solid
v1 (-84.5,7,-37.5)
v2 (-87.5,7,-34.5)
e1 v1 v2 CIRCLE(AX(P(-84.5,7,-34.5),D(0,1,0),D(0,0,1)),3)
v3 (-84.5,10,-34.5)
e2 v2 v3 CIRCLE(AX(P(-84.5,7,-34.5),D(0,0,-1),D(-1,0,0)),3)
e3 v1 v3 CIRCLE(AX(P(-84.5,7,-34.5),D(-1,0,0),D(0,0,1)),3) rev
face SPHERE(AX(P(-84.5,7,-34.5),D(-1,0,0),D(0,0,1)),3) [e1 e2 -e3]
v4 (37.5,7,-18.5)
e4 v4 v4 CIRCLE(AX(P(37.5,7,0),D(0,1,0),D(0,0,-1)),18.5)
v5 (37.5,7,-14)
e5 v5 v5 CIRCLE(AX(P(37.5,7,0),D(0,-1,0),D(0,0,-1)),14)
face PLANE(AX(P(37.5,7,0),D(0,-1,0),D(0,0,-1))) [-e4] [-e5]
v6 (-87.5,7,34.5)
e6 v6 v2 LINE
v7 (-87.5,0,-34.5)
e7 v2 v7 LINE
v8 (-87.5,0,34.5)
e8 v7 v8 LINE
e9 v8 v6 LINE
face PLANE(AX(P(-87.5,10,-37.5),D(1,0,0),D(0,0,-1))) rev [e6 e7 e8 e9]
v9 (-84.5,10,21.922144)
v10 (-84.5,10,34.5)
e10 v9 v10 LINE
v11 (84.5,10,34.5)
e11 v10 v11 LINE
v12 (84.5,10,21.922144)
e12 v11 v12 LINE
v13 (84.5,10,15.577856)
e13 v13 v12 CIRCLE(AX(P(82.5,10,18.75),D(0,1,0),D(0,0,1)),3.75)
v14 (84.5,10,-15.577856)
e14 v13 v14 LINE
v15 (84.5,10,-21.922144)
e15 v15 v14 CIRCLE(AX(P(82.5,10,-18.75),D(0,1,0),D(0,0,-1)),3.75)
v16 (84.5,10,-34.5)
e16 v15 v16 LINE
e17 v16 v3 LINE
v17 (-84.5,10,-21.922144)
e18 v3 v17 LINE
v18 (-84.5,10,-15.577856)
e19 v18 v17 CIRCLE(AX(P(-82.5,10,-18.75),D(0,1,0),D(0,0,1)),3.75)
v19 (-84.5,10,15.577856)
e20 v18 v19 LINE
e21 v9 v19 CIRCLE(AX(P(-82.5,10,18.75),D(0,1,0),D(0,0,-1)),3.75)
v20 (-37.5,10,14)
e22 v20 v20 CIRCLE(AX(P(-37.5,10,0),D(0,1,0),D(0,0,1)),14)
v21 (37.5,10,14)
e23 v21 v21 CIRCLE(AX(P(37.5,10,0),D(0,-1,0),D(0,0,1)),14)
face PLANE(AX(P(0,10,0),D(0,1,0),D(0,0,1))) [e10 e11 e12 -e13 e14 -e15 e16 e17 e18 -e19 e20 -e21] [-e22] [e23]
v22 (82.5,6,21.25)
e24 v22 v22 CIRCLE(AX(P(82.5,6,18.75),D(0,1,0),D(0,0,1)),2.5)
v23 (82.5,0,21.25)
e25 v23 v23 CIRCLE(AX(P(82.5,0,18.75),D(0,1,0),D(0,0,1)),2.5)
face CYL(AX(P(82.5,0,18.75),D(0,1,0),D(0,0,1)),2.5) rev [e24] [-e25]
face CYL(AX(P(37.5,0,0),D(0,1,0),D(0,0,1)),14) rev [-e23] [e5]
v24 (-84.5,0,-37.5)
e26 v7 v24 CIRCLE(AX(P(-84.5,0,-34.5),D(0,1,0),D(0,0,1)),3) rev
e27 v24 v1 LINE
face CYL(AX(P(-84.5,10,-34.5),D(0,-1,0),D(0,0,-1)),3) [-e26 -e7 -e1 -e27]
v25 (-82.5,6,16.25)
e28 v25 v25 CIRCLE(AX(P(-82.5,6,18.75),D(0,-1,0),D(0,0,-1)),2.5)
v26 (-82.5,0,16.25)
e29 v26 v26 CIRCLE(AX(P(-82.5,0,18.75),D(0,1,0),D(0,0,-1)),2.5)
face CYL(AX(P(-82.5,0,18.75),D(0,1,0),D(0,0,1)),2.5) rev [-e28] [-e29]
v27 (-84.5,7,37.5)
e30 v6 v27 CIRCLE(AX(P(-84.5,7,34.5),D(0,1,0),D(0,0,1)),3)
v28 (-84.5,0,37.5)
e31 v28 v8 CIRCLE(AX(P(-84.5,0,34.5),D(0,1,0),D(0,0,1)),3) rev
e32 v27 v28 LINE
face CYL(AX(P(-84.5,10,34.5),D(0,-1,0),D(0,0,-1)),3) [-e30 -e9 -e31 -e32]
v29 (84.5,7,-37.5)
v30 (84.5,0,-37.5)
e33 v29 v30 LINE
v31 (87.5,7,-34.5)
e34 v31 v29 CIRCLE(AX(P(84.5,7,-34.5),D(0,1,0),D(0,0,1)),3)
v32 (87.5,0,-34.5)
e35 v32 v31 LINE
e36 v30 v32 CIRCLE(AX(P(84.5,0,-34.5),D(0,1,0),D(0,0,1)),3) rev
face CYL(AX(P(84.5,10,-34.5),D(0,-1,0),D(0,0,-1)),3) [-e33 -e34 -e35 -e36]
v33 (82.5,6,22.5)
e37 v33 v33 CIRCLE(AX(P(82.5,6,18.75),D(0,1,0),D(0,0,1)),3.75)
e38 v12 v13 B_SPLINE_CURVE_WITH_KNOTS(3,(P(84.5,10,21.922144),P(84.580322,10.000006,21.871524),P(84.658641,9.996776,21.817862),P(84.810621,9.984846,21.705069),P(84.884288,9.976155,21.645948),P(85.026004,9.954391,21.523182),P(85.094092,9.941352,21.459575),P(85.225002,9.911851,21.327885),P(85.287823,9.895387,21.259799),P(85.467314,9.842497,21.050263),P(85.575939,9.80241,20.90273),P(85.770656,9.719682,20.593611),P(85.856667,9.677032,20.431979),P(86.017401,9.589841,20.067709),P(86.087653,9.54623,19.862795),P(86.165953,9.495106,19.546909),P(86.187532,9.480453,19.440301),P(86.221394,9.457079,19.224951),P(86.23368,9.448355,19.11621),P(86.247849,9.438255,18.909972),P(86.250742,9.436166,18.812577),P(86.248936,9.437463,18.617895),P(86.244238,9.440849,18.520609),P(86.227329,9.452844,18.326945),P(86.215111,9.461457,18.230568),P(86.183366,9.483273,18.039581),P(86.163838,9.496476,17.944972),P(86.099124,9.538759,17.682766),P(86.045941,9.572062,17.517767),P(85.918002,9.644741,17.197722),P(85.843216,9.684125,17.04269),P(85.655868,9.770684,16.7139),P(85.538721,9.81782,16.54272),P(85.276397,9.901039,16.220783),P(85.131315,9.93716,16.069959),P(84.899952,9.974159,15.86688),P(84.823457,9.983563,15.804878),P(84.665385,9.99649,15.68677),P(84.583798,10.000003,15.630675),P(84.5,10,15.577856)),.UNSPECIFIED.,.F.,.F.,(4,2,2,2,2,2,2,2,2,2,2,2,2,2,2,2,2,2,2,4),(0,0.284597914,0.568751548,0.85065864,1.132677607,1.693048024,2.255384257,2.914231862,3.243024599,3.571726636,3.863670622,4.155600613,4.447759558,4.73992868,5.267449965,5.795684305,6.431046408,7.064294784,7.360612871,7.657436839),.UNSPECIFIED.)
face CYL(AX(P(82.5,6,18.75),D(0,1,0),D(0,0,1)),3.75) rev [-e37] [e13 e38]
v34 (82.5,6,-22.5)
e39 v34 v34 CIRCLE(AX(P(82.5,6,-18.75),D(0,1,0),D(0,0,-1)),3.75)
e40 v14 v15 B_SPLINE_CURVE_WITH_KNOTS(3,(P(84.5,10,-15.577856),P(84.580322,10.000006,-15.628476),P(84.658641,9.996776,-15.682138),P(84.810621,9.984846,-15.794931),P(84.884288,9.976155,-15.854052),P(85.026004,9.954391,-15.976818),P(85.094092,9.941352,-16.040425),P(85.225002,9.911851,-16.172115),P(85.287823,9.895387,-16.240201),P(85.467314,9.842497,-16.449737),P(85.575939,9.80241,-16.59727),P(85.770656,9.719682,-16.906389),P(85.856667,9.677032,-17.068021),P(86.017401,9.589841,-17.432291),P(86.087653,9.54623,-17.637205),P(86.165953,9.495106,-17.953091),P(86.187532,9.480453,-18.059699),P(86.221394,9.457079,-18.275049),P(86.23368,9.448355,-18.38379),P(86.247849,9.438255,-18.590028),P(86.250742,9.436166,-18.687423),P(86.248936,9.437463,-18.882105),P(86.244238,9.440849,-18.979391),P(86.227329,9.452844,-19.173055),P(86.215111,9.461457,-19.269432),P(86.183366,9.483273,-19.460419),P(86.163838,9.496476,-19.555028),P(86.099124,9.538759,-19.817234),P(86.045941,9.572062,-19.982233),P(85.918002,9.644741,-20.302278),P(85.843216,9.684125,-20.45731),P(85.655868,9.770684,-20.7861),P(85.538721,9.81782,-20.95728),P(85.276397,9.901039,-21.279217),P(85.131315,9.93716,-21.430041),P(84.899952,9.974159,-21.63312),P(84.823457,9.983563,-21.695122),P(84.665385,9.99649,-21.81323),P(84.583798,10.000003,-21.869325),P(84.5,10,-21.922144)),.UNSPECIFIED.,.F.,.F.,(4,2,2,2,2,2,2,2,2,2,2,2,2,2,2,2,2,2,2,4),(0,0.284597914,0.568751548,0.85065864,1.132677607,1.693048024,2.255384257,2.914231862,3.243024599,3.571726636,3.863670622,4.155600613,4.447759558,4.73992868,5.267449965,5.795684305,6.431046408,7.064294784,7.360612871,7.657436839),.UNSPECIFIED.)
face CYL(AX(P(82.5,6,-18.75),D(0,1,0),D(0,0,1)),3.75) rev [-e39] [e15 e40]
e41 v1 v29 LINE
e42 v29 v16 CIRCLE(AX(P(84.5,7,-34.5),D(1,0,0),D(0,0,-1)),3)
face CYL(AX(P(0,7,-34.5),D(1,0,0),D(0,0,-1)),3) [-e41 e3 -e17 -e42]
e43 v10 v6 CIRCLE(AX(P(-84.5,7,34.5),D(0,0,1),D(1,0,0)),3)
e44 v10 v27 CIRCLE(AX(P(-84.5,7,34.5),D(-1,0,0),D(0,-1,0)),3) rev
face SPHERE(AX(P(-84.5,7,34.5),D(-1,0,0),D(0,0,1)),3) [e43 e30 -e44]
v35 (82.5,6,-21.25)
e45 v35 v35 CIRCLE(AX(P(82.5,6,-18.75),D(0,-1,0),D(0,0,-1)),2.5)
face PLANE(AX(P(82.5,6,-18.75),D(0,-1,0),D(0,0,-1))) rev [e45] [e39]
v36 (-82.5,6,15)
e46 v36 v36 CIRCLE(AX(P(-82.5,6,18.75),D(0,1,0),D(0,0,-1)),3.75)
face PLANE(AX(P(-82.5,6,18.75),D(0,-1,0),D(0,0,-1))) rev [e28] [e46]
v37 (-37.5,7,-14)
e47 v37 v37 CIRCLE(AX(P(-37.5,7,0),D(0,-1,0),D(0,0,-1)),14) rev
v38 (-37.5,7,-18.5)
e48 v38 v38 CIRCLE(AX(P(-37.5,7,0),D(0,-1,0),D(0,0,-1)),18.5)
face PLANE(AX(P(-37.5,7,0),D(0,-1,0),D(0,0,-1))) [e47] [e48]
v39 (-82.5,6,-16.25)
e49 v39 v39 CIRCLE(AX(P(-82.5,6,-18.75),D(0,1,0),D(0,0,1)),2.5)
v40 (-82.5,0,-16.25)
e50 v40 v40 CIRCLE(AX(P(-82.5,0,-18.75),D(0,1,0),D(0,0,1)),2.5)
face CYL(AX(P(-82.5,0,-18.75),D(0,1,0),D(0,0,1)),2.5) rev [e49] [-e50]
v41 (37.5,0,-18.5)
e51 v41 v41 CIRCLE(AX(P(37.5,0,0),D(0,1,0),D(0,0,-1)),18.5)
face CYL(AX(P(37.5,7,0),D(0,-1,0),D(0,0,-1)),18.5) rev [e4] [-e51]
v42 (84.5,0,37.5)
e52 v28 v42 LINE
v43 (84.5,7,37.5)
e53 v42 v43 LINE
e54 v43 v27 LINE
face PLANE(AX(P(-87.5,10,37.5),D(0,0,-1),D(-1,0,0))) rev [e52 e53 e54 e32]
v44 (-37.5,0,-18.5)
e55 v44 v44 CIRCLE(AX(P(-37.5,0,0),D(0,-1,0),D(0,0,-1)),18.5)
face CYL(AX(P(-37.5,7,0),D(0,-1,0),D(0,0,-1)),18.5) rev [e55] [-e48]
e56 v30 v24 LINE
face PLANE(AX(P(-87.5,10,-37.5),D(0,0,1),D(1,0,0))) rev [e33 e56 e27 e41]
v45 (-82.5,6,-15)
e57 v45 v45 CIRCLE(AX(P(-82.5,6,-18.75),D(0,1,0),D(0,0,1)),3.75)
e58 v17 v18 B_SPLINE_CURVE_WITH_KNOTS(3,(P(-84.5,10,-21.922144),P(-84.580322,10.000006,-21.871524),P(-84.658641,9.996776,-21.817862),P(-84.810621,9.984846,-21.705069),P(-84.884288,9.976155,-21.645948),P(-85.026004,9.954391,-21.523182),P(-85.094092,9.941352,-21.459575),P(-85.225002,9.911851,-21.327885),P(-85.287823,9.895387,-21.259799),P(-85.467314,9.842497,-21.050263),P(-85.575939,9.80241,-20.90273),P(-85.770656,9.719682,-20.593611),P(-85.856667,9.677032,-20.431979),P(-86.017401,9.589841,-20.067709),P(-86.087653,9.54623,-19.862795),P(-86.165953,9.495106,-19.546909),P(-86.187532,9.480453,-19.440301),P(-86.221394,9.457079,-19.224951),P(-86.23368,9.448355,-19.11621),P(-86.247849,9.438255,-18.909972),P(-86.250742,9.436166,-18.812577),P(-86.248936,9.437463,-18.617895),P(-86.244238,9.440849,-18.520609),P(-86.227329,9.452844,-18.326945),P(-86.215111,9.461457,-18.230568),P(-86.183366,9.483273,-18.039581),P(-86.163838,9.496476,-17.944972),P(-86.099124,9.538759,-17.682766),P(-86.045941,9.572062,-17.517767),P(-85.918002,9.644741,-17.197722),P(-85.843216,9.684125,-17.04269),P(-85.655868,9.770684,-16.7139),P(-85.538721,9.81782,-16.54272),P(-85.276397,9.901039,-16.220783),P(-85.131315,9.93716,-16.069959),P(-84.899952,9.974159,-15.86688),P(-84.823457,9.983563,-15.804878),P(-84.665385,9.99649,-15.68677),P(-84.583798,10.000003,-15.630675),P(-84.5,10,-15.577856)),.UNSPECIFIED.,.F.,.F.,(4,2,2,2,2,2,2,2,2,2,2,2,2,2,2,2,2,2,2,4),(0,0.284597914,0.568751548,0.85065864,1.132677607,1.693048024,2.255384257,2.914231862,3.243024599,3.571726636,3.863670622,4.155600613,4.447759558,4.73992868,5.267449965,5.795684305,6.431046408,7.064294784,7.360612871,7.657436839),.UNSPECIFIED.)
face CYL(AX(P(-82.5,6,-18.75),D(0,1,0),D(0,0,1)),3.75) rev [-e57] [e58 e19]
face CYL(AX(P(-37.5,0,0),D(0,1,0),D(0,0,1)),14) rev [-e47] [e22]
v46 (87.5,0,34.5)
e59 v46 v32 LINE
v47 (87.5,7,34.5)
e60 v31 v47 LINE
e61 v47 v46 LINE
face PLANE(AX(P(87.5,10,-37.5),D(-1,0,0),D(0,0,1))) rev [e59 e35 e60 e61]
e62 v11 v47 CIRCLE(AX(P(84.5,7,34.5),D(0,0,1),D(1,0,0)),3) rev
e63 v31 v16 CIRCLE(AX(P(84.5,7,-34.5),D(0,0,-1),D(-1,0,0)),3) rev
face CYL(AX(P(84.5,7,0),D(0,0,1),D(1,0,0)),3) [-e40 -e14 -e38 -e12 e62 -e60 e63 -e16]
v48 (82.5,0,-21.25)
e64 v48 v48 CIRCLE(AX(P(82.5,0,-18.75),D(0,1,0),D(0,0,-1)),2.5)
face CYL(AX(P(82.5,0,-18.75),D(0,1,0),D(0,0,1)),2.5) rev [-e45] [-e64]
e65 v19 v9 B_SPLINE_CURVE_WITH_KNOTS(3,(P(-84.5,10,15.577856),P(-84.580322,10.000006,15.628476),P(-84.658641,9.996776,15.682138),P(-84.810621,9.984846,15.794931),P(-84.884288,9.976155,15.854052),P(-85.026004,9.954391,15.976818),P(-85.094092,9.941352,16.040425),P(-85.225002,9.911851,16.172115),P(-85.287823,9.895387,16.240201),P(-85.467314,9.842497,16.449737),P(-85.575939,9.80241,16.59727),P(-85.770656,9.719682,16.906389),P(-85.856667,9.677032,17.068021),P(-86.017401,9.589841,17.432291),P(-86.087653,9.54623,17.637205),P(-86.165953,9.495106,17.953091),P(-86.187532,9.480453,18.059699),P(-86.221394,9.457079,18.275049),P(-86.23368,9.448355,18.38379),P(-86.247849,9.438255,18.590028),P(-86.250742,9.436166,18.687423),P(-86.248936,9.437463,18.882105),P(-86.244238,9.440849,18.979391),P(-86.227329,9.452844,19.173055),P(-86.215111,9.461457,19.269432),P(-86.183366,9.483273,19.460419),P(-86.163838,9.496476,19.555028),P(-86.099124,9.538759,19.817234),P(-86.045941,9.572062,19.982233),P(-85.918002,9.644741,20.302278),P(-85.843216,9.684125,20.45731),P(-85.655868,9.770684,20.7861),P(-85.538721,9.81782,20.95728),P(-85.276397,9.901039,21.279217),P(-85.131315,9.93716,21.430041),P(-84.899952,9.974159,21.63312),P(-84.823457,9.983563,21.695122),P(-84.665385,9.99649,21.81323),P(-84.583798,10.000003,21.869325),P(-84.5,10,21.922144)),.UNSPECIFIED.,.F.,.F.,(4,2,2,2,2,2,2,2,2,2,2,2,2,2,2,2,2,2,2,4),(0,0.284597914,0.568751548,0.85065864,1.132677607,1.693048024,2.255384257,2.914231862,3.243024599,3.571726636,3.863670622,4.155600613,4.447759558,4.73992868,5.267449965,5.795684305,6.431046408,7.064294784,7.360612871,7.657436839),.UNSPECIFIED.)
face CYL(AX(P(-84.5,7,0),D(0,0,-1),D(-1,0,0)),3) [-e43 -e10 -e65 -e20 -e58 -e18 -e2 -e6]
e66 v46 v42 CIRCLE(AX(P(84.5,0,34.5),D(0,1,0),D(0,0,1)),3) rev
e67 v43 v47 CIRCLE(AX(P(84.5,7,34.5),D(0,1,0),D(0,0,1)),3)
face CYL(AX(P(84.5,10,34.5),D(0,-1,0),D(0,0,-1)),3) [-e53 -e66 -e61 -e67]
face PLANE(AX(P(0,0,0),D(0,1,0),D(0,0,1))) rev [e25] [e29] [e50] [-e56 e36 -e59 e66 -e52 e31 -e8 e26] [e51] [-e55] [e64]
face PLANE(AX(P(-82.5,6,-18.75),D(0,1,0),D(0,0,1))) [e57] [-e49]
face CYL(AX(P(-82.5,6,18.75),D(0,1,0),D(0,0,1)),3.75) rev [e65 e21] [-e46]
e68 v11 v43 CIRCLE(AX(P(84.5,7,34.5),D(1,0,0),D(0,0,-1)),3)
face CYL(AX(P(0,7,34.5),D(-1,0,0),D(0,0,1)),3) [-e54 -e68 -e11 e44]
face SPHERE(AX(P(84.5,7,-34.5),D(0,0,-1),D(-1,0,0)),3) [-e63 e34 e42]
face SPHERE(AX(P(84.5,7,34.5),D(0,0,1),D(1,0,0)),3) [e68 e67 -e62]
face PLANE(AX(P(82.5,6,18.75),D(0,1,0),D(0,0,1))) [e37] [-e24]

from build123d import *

# Parameters (mm, degrees)
SKETCH1_W           = 175
SKETCH1_H           = 75
BOSS_EXTRUDE1_DEPTH = 10
SKETCH2_R           = 3.75
CUT_EXTRUDE1_DEPTH  = 4
SKETCH3_R           = 2.5
CUT_EXTRUDE2_DEPTH  = 96.720948595
SKETCH4_R           = 14
CUT_EXTRUDE3_DEPTH  = 96.720948595
SKETCH5_R           = 18.5
CUT_EXTRUDE4_DEPTH  = 7
FILLET1_R           = 3


with BuildPart() as part:
    # Sketch1 → Boss-Extrude1 (new body)
    with BuildSketch(Plane(origin=(0, 0, 0), x_dir=(1, 0, 0), z_dir=(0, 1, 0))):
        Rectangle(SKETCH1_W, SKETCH1_H)
    extrude(amount=BOSS_EXTRUDE1_DEPTH)

    # Sketch2 → Cut-Extrude1 (cut)
    with BuildSketch(Plane(origin=(0, 10, 0), x_dir=(1, 0, 0), z_dir=(0, 1, 0))):
        with Locations(Location((-82.5, 18.75, 0), (0, 0, 270))):
            Circle(SKETCH2_R)
        with Locations(Location((-82.5, -18.75, 0), (0, 0, 90))):
            Circle(SKETCH2_R)
        with Locations(Location((82.5, -18.75, 0), (0, 0, 270))):
            Circle(SKETCH2_R)
        with Locations(Location((82.5, 18.75, 0), (0, 0, 90))):
            Circle(SKETCH2_R)
    extrude(amount=-CUT_EXTRUDE1_DEPTH, mode=Mode.SUBTRACT)

    # Sketch3 → Cut-Extrude2 (cut, through all)
    with BuildSketch(Plane(origin=(0, 10, 0), x_dir=(1, 0, 0), z_dir=(0, 1, 0))):
        with Locations(Location((-82.5, 18.75, 0), (0, 0, 270))):
            Circle(SKETCH3_R)
        with Locations(Location((-82.5, -18.75, 0), (0, 0, 90))):
            Circle(SKETCH3_R)
        with Locations(Location((82.5, -18.75, 0), (0, 0, 270))):
            Circle(SKETCH3_R)
        with Locations(Location((82.5, 18.75, 0), (0, 0, 90))):
            Circle(SKETCH3_R)
    extrude(amount=-CUT_EXTRUDE2_DEPTH, mode=Mode.SUBTRACT)

    # Sketch4 → Cut-Extrude3 (cut, through all)
    with BuildSketch(Plane(origin=(0, 10, 0), x_dir=(1, 0, 0), z_dir=(0, 1, 0))):
        with Locations(Location((-37.5, 0, 0), (0, 0, 270))):
            Circle(SKETCH4_R)
    cut_extrude3 = extrude(amount=-CUT_EXTRUDE3_DEPTH, mode=Mode.SUBTRACT)

    # Sketch5 → Cut-Extrude4 (cut)
    with BuildSketch(Plane.XZ):
        with Locations(Location((-37.5, 0, 0), (0, 0, 270))):
            Circle(SKETCH5_R)
    cut_extrude4 = extrude(amount=-CUT_EXTRUDE4_DEPTH, mode=Mode.SUBTRACT)

    # Mirror1: Cut-Extrude3, Cut-Extrude4 across plane
    add(cut_extrude3.mirror(Plane(origin=(0, 0, 0), x_dir=(0, 0, 1), z_dir=(1, 0, 0))), mode=Mode.SUBTRACT)
    add(cut_extrude4.mirror(Plane(origin=(0, 0, 0), x_dir=(0, 0, 1), z_dir=(1, 0, 0))), mode=Mode.SUBTRACT)

    # Fillet1
    # the kernel refuses this fillet: 3 mm, written as the material it takes off along each edge
    with BuildSketch(Plane(origin=(-84.5, 7, 34.5), x_dir=(0, 1, 0), z_dir=(-1, 0, 0))) as fillet1_piece_1_section:
        Polygon((0, 0), (FILLET1_R, 0), (FILLET1_R, -FILLET1_R), (0, -FILLET1_R), align=None)
    fillet1_piece_1 = extrude(amount=FILLET1_R, mode=Mode.PRIVATE)
    fillet1_piece_1 = fillet1_piece_1 - Plane(origin=(-84.5, 7, 34.5), x_dir=(0, -0.7071067811865475, -0.7071067811865475), z_dir=(-1, 0, 0)) * Sphere(FILLET1_R, mode=Mode.PRIVATE)
    add(fillet1_piece_1, mode=Mode.SUBTRACT)
    with BuildSketch(Plane(origin=(-84.5, 7, -34.5), x_dir=(-1, 0, 0), z_dir=(0, 0, -1))) as fillet1_piece_2_section:
        Polygon((0, 0), (FILLET1_R, 0), (FILLET1_R, FILLET1_R), (0, FILLET1_R), align=None)
    fillet1_piece_2 = extrude(amount=FILLET1_R, mode=Mode.PRIVATE)
    fillet1_piece_2 = fillet1_piece_2 - Plane(origin=(-84.5, 7, -34.5), x_dir=(0.7071067811865475, -0.7071067811865475, 0), z_dir=(0, 0, -1)) * Sphere(FILLET1_R, mode=Mode.PRIVATE)
    add(fillet1_piece_2, mode=Mode.SUBTRACT)
    with BuildSketch(Plane(origin=(84.5, 7, 34.5), x_dir=(0, 1, 0), z_dir=(1, 0, 0))) as fillet1_piece_3_section:
        Polygon((0, 0), (FILLET1_R, 0), (FILLET1_R, FILLET1_R), (0, FILLET1_R), align=None)
    fillet1_piece_3 = extrude(amount=FILLET1_R, mode=Mode.PRIVATE)
    fillet1_piece_3 = fillet1_piece_3 - Plane(origin=(84.5, 7, 34.5), x_dir=(0, -0.7071067811865475, -0.7071067811865475), z_dir=(1, 0, 0)) * Sphere(FILLET1_R, mode=Mode.PRIVATE)
    add(fillet1_piece_3, mode=Mode.SUBTRACT)
    with BuildSketch(Plane(origin=(84.5, 7, -34.5), x_dir=(1, 0, 0), z_dir=(0, 0, -1))) as fillet1_piece_4_section:
        Polygon((0, 0), (FILLET1_R, 0), (FILLET1_R, -FILLET1_R), (0, -FILLET1_R), align=None)
    fillet1_piece_4 = extrude(amount=FILLET1_R, mode=Mode.PRIVATE)
    fillet1_piece_4 = fillet1_piece_4 - Plane(origin=(84.5, 7, -34.5), x_dir=(-0.7071067811865475, -0.7071067811865475, 0), z_dir=(0, 0, -1)) * Sphere(FILLET1_R, mode=Mode.PRIVATE)
    add(fillet1_piece_4, mode=Mode.SUBTRACT)
    with BuildSketch(Plane(origin=(-87.5, 10, 34.5), x_dir=(0, -1, 0), z_dir=(0, 0, -1)), Plane(origin=(87.5, 10, -34.5), x_dir=(0, -1, 0), z_dir=(0, 0, 1))) as fillet1_piece_5:
        with BuildLine():
            CenterArc((FILLET1_R, -FILLET1_R), FILLET1_R, 90, 90)
            Line((0, -FILLET1_R), (0, 0))
            Line((0, 0), (FILLET1_R, 0))
        make_face()
    extrude(amount=69, mode=Mode.SUBTRACT)
    with BuildSketch(Plane(origin=(84.5, 10, 37.5), x_dir=(0, 0, -1), z_dir=(-1, 0, 0))) as fillet1_piece_6:
        with BuildLine():
            CenterArc((FILLET1_R, FILLET1_R), FILLET1_R, 180, 90)
            Line((0, FILLET1_R), (0, 0))
            Line((0, 0), (FILLET1_R, 0))
        make_face()
    extrude(amount=169, mode=Mode.SUBTRACT)
    with BuildSketch(Plane(origin=(87.5, -7.5, 37.5), x_dir=(0, 0, -1), z_dir=(0, 1, 0)), Plane(origin=(87.5, -7.5, -37.5), x_dir=(-1, 0, 0), z_dir=(0, 1, 0))) as fillet1_piece_7:
        with BuildLine():
            CenterArc((FILLET1_R, FILLET1_R), FILLET1_R, 180, 90)
            Line((0, FILLET1_R), (0, 0))
            Line((0, 0), (FILLET1_R, 0))
        make_face()
    extrude(amount=14.5, mode=Mode.SUBTRACT)
    with BuildSketch(Plane(origin=(-87.5, -7.5, 37.5), x_dir=(0, 0, -1), z_dir=(0, 1, 0)), Plane(origin=(-87.5, -7.5, -37.5), x_dir=(1, 0, 0), z_dir=(0, 1, 0))) as fillet1_piece_8:
        with BuildLine():
            CenterArc((FILLET1_R, -FILLET1_R), FILLET1_R, 90, 90)
            Line((0, -FILLET1_R), (0, 0))
            Line((0, 0), (FILLET1_R, 0))
        make_face()
    extrude(amount=14.5, mode=Mode.SUBTRACT)
    with BuildSketch(Plane(origin=(-84.5, 10, -37.5), x_dir=(0, -1, 0), z_dir=(1, 0, 0))) as fillet1_piece_9:
        with BuildLine():
            CenterArc((FILLET1_R, -FILLET1_R), FILLET1_R, 90, 90)
            Line((0, -FILLET1_R), (0, 0))
            Line((0, 0), (FILLET1_R, 0))
        make_face()
    extrude(amount=169, mode=Mode.SUBTRACT)


solid = part.part
